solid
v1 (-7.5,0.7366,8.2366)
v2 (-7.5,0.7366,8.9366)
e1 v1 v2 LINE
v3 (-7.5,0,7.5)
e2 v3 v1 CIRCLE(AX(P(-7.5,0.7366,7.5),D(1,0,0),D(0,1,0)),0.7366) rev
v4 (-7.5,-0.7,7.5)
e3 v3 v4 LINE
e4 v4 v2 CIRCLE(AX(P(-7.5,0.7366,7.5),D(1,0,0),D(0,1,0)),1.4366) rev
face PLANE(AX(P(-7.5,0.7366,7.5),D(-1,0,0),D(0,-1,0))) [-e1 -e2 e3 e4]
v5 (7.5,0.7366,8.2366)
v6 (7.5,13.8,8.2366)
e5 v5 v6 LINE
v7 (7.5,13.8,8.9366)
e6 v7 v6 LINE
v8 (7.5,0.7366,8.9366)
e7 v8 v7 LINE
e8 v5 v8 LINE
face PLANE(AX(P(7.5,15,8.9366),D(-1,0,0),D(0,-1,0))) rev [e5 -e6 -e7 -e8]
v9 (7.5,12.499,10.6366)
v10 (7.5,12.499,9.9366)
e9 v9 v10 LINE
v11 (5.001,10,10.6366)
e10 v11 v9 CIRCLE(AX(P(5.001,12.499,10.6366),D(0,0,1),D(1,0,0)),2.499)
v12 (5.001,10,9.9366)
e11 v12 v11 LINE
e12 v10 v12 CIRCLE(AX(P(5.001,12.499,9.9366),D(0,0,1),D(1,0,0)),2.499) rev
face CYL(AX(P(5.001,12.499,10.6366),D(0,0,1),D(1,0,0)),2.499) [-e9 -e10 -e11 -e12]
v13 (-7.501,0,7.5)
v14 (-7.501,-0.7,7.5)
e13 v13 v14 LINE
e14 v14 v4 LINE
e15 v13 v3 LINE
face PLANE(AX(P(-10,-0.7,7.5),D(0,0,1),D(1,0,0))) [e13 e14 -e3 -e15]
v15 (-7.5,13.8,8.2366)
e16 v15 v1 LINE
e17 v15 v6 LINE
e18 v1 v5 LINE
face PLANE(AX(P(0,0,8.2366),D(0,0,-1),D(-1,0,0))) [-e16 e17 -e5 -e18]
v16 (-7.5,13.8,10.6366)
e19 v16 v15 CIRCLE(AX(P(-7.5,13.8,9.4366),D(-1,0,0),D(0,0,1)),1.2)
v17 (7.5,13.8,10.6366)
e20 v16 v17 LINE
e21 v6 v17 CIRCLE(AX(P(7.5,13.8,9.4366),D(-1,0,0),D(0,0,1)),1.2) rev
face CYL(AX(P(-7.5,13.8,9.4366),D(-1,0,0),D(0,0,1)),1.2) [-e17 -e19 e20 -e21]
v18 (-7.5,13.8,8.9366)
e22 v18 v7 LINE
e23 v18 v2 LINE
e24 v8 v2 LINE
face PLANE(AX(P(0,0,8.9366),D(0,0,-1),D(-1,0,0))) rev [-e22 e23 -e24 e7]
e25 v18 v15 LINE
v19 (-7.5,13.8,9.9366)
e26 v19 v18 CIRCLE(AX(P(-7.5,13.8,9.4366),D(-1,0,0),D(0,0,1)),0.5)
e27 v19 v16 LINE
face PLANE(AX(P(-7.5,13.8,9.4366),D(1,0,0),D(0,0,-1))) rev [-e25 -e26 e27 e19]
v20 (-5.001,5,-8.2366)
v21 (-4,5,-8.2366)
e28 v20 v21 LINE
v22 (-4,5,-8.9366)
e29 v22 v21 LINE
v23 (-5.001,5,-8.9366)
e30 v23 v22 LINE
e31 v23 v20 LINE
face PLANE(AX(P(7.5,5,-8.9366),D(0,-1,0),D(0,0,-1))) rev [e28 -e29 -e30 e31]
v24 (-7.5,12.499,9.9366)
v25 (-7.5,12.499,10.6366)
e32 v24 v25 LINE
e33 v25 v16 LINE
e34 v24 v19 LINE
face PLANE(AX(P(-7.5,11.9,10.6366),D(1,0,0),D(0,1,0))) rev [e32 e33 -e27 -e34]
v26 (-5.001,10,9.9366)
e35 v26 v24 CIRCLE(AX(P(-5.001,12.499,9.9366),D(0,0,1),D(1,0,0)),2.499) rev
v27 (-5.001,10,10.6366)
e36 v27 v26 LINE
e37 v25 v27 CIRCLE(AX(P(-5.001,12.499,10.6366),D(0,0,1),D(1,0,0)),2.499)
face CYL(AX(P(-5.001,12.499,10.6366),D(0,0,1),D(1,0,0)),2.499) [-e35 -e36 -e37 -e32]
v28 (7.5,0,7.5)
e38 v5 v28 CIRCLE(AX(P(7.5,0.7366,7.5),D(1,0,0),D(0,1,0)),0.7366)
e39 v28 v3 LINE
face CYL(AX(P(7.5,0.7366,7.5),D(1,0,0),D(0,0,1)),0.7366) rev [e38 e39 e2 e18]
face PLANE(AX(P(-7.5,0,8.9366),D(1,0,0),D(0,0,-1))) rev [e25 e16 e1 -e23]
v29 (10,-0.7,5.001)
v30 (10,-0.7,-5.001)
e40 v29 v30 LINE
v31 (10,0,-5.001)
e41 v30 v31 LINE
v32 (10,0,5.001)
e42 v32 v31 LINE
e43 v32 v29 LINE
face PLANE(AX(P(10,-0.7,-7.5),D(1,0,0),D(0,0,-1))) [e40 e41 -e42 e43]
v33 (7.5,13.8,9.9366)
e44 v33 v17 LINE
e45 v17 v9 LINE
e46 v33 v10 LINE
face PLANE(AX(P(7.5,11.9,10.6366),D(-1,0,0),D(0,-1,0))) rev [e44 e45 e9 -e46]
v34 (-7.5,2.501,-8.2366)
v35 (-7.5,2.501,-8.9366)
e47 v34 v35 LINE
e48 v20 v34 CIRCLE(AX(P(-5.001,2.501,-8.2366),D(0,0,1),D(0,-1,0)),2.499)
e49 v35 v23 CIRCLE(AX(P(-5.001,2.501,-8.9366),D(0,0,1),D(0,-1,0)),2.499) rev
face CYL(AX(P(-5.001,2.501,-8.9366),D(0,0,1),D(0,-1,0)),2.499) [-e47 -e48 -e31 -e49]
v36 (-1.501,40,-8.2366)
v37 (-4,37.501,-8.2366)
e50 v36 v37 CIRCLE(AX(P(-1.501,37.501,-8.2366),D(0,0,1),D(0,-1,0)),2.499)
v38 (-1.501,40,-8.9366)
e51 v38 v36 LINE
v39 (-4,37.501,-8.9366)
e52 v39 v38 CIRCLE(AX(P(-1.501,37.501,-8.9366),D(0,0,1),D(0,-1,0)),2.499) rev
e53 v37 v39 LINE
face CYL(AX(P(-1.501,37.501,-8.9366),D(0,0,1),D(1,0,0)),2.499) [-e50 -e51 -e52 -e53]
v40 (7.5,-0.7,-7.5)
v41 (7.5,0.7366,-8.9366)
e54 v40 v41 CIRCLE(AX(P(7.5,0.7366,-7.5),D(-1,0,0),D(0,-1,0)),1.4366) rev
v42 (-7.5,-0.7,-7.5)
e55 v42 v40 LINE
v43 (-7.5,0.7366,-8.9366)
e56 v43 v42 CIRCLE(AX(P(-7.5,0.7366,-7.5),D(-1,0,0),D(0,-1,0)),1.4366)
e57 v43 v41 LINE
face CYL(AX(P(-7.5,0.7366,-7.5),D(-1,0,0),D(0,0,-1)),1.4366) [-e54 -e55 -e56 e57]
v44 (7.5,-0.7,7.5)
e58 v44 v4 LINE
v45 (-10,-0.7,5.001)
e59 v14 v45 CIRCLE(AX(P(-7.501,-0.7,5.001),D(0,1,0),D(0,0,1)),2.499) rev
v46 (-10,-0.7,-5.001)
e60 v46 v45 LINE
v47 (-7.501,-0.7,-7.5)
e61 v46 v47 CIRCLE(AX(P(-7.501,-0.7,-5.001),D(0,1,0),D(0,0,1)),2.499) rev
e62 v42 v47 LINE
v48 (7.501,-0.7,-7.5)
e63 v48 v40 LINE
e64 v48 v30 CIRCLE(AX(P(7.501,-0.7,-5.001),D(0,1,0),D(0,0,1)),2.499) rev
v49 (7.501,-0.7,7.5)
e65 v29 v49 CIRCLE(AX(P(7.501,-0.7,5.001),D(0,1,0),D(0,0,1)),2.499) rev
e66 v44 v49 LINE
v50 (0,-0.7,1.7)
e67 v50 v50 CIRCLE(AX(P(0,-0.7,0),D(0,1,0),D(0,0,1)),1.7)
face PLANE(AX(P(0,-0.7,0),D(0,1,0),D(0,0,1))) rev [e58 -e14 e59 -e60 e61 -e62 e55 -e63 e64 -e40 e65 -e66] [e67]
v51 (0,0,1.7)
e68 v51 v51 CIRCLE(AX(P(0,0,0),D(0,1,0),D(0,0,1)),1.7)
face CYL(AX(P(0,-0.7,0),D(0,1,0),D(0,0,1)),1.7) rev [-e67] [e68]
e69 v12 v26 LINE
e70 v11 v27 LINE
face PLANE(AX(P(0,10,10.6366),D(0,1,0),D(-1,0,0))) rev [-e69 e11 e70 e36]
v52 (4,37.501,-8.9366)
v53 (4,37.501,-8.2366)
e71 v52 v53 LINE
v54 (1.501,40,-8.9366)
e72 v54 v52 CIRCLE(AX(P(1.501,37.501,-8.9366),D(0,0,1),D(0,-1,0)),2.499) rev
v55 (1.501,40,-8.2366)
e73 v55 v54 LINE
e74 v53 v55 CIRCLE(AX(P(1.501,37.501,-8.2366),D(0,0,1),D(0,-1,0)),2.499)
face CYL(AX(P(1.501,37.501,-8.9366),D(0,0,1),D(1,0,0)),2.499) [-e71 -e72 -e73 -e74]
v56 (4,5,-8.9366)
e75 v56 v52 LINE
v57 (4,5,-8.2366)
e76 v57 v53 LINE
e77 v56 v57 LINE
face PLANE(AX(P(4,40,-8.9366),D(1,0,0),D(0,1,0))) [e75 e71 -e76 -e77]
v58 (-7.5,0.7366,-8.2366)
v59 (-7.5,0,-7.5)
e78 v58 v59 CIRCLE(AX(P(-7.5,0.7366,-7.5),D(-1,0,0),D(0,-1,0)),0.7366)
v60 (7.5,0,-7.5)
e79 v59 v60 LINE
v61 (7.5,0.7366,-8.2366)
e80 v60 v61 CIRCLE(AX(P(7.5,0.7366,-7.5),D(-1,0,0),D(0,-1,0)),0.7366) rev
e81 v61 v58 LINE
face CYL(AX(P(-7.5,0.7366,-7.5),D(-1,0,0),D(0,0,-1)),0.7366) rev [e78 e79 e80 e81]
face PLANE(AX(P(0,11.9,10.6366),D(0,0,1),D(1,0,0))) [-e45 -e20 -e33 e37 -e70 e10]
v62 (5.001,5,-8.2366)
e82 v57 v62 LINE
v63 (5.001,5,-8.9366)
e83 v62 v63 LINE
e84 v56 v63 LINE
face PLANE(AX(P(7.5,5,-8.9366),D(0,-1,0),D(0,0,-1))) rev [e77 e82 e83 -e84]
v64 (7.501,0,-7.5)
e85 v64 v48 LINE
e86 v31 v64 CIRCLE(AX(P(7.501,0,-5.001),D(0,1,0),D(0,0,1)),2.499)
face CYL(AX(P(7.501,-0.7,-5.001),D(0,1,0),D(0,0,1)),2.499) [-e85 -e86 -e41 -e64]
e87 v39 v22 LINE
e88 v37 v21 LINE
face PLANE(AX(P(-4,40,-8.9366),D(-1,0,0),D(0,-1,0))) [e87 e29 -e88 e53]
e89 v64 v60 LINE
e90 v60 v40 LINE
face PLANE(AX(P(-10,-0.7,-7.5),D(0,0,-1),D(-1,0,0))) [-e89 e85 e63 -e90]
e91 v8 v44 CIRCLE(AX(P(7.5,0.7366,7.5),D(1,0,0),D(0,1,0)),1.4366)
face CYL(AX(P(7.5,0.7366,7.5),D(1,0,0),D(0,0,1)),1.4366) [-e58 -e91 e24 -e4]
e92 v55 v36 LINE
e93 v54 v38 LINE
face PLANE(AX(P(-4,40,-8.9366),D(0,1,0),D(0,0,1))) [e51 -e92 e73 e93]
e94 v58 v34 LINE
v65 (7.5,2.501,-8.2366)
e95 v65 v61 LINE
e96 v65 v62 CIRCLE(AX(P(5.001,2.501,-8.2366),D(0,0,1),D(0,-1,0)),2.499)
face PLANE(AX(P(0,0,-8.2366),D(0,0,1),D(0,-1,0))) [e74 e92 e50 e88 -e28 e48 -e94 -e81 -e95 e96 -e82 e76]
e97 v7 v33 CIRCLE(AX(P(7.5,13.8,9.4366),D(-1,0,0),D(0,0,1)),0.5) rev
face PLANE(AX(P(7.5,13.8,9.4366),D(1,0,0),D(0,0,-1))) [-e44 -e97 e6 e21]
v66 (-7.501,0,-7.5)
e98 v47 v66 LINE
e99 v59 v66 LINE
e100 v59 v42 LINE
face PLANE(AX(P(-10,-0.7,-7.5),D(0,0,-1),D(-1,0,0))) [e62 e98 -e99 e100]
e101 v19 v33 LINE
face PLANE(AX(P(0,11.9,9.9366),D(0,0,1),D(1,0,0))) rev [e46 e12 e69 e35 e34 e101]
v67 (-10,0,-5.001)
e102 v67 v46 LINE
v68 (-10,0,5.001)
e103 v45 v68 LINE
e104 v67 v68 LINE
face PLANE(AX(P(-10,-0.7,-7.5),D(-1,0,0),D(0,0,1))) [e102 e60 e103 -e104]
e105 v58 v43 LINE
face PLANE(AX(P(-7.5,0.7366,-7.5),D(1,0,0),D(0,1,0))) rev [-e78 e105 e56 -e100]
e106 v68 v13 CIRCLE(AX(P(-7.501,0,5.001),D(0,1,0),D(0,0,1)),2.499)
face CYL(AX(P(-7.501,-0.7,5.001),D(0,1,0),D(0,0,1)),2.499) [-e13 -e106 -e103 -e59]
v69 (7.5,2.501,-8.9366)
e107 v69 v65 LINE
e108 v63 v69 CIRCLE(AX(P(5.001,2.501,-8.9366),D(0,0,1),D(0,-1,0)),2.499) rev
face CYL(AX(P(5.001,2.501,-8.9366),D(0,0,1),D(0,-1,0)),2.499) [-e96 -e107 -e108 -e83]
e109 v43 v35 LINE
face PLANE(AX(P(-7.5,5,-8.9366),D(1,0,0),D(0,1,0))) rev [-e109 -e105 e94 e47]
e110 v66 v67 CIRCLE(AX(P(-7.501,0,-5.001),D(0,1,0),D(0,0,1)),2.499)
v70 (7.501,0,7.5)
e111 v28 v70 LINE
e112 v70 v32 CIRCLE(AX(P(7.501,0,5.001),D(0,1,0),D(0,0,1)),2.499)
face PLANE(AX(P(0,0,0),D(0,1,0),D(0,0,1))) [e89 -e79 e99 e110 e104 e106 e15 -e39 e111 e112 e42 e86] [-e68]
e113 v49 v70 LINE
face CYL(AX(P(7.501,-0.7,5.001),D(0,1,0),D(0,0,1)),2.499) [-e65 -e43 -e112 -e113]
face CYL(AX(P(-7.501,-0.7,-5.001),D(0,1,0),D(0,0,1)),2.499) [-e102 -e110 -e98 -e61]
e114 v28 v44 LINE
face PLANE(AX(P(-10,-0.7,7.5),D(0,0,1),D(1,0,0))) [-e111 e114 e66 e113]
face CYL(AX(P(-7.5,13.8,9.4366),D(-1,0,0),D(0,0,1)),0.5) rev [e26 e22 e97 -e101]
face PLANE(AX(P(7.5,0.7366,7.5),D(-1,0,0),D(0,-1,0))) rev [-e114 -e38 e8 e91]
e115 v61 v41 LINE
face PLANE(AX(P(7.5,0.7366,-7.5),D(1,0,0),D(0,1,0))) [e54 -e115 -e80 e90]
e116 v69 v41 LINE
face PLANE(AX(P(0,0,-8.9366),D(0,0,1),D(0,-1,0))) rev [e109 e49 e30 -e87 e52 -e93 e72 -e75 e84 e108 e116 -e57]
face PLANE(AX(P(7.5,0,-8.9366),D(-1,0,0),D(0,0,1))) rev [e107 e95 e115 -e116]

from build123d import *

# Parameters (mm, degrees)
SKETCH1_W             = 20
SKETCH1_H             = 15
BASE_FLANGE1_DEPTH    = 0.7
EDGE_FLANGE1_DEPTH    = 15
SKETCH7_W             = 8
SKETCH7_H             = 35
TAB1_DEPTH            = 0.7
EDGE_FLANGE2_DEPTH    = 15
HEM1_START            = -7.5
HEM1_DEPTH            = 15
HEM1_2_DEPTH          = 15
SKETCH13_R            = 1.7
CUT_EXTRUDE1_DEPTH    = 0.7
BREAK_CORNER2_START   = -8.9366
BREAK_CORNER2_DEPTH   = 0.7
BREAK_CORNER2_START_2 = 9.9366
BREAK_CORNER2_2_DEPTH = 0.7
BREAK_CORNER2_START_3 = -0.7
BREAK_CORNER2_3_DEPTH = 0.7


# Read off the part's stored shape, not the designer's step: Hem1, Break-Corner2
# Sheet-metal steps are written as plain solids
with BuildPart() as part:
    # Sketch1 → Base-Flange1 (new body)
    with BuildSketch(Plane(origin=(0, 0, 0), x_dir=(1, 0, 0), z_dir=(0, 1, 0))):
        Rectangle(SKETCH1_W, SKETCH1_H)
    extrude(amount=-BASE_FLANGE1_DEPTH)

    # Edge-Flange1 section (across the edge) → Edge-Flange1 (add)
    with BuildSketch(Plane(origin=(7.5, 0, -8.2366), x_dir=(0, 0, 1), z_dir=(-1, 0, 0))):
        with BuildLine():
            Line((-0.7, 0.7366), (-0.7, 5))
            Line((-0.7, 5), (0, 5))
            Line((0, 5), (0, 0.7366))
            ThreePointArc((0, 0.7366), (0.215745145, 0.215745145), (0.7366, 0))
            Line((0.7366, 0), (0.7366, -0.7))
            ThreePointArc((0.7366, -0.7), (-0.279229602, -0.279229602), (-0.7, 0.7366))
        make_face()
    extrude(amount=EDGE_FLANGE1_DEPTH)

    # Sketch7 → Tab1 (add)
    with BuildSketch(Plane.XY.offset(-8.2366)):
        with Locations((0, 22.5)):
            Rectangle(SKETCH7_W, SKETCH7_H)
    extrude(amount=-TAB1_DEPTH)

    # Edge-Flange2 section (across the edge) → Edge-Flange2 (add)
    with BuildSketch(Plane(origin=(-7.5, 0, 8.2366), x_dir=(0, 0, -1), z_dir=(1, 0, 0))):
        with BuildLine():
            Line((-0.7, 0.7366), (-0.7, 15))
            Line((-0.7, 15), (0, 15))
            Line((0, 15), (0, 0.7366))
            ThreePointArc((0, 0.7366), (0.215745145, 0.215745145), (0.7366, 0))
            Line((0.7366, 0), (0.7366, -0.7))
            ThreePointArc((0.7366, -0.7), (-0.279229602, -0.279229602), (-0.7, 0.7366))
        make_face()
    extrude(amount=EDGE_FLANGE2_DEPTH)

    # Hem1 outline → Hem1 (cut)
    with BuildSketch(Plane.YZ.offset(HEM1_START)):
        with BuildLine():
            Line((15, 8.9366), (14.890871211, 8.9366))
            ThreePointArc((14.890871211, 8.9366), (14.44807407, 8.426649506), (13.8, 8.2366))
            Line((13.8, 8.2366), (15, 8.2366))
            Line((15, 8.2366), (15, 8.9366))
        make_face()
    extrude(amount=HEM1_DEPTH, mode=Mode.SUBTRACT)

    # Hem1 2 outline → Hem1 2 (add)
    with BuildSketch(Plane.YZ.offset(HEM1_START)):
        with BuildLine():
            Line((10, 10.6366), (10, 9.9366))
            Line((10, 9.9366), (13.8, 9.9366))
            ThreePointArc((13.8, 9.9366), (14.3, 9.4366), (13.8, 8.9366))
            Line((13.8, 8.9366), (14.890871211, 8.9366))
            ThreePointArc((14.890871211, 8.9366), (14.809950494, 10.08467407), (13.8, 10.6366))
            Line((13.8, 10.6366), (10, 10.6366))
        make_face()
    extrude(amount=HEM1_2_DEPTH)

    # Sketch13 → Cut-Extrude1 (cut)
    with BuildSketch(Plane(origin=(0, 0, 0), x_dir=(1, 0, 0), z_dir=(0, 1, 0))):
        with Locations(Location((0, 0, 0), (0, 0, 270))):
            Circle(SKETCH13_R)
    extrude(amount=-CUT_EXTRUDE1_DEPTH, mode=Mode.SUBTRACT)

    # Break-Corner2 outline → Break-Corner2 (cut)
    with BuildSketch(Plane.XY.offset(BREAK_CORNER2_START)):
        with BuildLine():
            Line((7.5, 5), (5.001, 5))
            ThreePointArc((5.001, 5), (6.768059846, 4.268059846), (7.5, 2.501))
            Line((7.5, 2.501), (7.5, 5))
        make_face()
        with BuildLine():
            ThreePointArc((-7.5, 2.501), (-6.768059846, 4.268059846), (-5.001, 5))
            Line((-5.001, 5), (-7.5, 5))
            Line((-7.5, 5), (-7.5, 2.501))
        make_face()
        with BuildLine():
            Line((-4, 40), (-4, 37.501))
            ThreePointArc((-4, 37.501), (-3.268059846, 39.268059846), (-1.501, 40))
            Line((-1.501, 40), (-4, 40))
        make_face()
        with BuildLine():
            ThreePointArc((1.501, 40), (3.268059846, 39.268059846), (4, 37.501))
            Line((4, 37.501), (4, 40))
            Line((4, 40), (1.501, 40))
        make_face()
    extrude(amount=BREAK_CORNER2_DEPTH, mode=Mode.SUBTRACT)

    # Break-Corner2 2 outline → Break-Corner2 2 (cut)
    with BuildSketch(Plane.XY.offset(BREAK_CORNER2_START_2)):
        with BuildLine():
            ThreePointArc((7.5, 12.499), (6.768059846, 10.731940154), (5.001, 10))
            Line((5.001, 10), (7.5, 10))
            Line((7.5, 10), (7.5, 12.499))
        make_face()
        with BuildLine():
            ThreePointArc((-5.001, 10), (-6.768059846, 10.731940154), (-7.5, 12.499))
            Line((-7.5, 12.499), (-7.5, 10))
            Line((-7.5, 10), (-5.001, 10))
        make_face()
    extrude(amount=BREAK_CORNER2_2_DEPTH, mode=Mode.SUBTRACT)

    # Break-Corner2 3 outline → Break-Corner2 3 (cut)
    with BuildSketch(Plane(origin=(0, 0, 0), x_dir=(1, 0, 0), z_dir=(0, 1, 0)).offset(BREAK_CORNER2_START_3)):
        with BuildLine():
            ThreePointArc((7.501, 7.5), (9.268059846, 6.768059846), (10, 5.001))
            Line((10, 5.001), (10, 7.5))
            Line((10, 7.5), (7.501, 7.5))
        make_face()
        with BuildLine():
            ThreePointArc((10, -5.001), (9.268059846, -6.768059846), (7.501, -7.5))
            Line((7.501, -7.5), (10, -7.5))
            Line((10, -7.5), (10, -5.001))
        make_face()
        with BuildLine():
            Line((-10, 7.5), (-10, 5.001))
            ThreePointArc((-10, 5.001), (-9.268059846, 6.768059846), (-7.501, 7.5))
            Line((-7.501, 7.5), (-10, 7.5))
        make_face()
        with BuildLine():
            ThreePointArc((-7.501, -7.5), (-9.268059846, -6.768059846), (-10, -5.001))
            Line((-10, -5.001), (-10, -7.5))
            Line((-10, -7.5), (-7.501, -7.5))
        make_face()
    extrude(amount=BREAK_CORNER2_3_DEPTH, mode=Mode.SUBTRACT)


solid = part.part
